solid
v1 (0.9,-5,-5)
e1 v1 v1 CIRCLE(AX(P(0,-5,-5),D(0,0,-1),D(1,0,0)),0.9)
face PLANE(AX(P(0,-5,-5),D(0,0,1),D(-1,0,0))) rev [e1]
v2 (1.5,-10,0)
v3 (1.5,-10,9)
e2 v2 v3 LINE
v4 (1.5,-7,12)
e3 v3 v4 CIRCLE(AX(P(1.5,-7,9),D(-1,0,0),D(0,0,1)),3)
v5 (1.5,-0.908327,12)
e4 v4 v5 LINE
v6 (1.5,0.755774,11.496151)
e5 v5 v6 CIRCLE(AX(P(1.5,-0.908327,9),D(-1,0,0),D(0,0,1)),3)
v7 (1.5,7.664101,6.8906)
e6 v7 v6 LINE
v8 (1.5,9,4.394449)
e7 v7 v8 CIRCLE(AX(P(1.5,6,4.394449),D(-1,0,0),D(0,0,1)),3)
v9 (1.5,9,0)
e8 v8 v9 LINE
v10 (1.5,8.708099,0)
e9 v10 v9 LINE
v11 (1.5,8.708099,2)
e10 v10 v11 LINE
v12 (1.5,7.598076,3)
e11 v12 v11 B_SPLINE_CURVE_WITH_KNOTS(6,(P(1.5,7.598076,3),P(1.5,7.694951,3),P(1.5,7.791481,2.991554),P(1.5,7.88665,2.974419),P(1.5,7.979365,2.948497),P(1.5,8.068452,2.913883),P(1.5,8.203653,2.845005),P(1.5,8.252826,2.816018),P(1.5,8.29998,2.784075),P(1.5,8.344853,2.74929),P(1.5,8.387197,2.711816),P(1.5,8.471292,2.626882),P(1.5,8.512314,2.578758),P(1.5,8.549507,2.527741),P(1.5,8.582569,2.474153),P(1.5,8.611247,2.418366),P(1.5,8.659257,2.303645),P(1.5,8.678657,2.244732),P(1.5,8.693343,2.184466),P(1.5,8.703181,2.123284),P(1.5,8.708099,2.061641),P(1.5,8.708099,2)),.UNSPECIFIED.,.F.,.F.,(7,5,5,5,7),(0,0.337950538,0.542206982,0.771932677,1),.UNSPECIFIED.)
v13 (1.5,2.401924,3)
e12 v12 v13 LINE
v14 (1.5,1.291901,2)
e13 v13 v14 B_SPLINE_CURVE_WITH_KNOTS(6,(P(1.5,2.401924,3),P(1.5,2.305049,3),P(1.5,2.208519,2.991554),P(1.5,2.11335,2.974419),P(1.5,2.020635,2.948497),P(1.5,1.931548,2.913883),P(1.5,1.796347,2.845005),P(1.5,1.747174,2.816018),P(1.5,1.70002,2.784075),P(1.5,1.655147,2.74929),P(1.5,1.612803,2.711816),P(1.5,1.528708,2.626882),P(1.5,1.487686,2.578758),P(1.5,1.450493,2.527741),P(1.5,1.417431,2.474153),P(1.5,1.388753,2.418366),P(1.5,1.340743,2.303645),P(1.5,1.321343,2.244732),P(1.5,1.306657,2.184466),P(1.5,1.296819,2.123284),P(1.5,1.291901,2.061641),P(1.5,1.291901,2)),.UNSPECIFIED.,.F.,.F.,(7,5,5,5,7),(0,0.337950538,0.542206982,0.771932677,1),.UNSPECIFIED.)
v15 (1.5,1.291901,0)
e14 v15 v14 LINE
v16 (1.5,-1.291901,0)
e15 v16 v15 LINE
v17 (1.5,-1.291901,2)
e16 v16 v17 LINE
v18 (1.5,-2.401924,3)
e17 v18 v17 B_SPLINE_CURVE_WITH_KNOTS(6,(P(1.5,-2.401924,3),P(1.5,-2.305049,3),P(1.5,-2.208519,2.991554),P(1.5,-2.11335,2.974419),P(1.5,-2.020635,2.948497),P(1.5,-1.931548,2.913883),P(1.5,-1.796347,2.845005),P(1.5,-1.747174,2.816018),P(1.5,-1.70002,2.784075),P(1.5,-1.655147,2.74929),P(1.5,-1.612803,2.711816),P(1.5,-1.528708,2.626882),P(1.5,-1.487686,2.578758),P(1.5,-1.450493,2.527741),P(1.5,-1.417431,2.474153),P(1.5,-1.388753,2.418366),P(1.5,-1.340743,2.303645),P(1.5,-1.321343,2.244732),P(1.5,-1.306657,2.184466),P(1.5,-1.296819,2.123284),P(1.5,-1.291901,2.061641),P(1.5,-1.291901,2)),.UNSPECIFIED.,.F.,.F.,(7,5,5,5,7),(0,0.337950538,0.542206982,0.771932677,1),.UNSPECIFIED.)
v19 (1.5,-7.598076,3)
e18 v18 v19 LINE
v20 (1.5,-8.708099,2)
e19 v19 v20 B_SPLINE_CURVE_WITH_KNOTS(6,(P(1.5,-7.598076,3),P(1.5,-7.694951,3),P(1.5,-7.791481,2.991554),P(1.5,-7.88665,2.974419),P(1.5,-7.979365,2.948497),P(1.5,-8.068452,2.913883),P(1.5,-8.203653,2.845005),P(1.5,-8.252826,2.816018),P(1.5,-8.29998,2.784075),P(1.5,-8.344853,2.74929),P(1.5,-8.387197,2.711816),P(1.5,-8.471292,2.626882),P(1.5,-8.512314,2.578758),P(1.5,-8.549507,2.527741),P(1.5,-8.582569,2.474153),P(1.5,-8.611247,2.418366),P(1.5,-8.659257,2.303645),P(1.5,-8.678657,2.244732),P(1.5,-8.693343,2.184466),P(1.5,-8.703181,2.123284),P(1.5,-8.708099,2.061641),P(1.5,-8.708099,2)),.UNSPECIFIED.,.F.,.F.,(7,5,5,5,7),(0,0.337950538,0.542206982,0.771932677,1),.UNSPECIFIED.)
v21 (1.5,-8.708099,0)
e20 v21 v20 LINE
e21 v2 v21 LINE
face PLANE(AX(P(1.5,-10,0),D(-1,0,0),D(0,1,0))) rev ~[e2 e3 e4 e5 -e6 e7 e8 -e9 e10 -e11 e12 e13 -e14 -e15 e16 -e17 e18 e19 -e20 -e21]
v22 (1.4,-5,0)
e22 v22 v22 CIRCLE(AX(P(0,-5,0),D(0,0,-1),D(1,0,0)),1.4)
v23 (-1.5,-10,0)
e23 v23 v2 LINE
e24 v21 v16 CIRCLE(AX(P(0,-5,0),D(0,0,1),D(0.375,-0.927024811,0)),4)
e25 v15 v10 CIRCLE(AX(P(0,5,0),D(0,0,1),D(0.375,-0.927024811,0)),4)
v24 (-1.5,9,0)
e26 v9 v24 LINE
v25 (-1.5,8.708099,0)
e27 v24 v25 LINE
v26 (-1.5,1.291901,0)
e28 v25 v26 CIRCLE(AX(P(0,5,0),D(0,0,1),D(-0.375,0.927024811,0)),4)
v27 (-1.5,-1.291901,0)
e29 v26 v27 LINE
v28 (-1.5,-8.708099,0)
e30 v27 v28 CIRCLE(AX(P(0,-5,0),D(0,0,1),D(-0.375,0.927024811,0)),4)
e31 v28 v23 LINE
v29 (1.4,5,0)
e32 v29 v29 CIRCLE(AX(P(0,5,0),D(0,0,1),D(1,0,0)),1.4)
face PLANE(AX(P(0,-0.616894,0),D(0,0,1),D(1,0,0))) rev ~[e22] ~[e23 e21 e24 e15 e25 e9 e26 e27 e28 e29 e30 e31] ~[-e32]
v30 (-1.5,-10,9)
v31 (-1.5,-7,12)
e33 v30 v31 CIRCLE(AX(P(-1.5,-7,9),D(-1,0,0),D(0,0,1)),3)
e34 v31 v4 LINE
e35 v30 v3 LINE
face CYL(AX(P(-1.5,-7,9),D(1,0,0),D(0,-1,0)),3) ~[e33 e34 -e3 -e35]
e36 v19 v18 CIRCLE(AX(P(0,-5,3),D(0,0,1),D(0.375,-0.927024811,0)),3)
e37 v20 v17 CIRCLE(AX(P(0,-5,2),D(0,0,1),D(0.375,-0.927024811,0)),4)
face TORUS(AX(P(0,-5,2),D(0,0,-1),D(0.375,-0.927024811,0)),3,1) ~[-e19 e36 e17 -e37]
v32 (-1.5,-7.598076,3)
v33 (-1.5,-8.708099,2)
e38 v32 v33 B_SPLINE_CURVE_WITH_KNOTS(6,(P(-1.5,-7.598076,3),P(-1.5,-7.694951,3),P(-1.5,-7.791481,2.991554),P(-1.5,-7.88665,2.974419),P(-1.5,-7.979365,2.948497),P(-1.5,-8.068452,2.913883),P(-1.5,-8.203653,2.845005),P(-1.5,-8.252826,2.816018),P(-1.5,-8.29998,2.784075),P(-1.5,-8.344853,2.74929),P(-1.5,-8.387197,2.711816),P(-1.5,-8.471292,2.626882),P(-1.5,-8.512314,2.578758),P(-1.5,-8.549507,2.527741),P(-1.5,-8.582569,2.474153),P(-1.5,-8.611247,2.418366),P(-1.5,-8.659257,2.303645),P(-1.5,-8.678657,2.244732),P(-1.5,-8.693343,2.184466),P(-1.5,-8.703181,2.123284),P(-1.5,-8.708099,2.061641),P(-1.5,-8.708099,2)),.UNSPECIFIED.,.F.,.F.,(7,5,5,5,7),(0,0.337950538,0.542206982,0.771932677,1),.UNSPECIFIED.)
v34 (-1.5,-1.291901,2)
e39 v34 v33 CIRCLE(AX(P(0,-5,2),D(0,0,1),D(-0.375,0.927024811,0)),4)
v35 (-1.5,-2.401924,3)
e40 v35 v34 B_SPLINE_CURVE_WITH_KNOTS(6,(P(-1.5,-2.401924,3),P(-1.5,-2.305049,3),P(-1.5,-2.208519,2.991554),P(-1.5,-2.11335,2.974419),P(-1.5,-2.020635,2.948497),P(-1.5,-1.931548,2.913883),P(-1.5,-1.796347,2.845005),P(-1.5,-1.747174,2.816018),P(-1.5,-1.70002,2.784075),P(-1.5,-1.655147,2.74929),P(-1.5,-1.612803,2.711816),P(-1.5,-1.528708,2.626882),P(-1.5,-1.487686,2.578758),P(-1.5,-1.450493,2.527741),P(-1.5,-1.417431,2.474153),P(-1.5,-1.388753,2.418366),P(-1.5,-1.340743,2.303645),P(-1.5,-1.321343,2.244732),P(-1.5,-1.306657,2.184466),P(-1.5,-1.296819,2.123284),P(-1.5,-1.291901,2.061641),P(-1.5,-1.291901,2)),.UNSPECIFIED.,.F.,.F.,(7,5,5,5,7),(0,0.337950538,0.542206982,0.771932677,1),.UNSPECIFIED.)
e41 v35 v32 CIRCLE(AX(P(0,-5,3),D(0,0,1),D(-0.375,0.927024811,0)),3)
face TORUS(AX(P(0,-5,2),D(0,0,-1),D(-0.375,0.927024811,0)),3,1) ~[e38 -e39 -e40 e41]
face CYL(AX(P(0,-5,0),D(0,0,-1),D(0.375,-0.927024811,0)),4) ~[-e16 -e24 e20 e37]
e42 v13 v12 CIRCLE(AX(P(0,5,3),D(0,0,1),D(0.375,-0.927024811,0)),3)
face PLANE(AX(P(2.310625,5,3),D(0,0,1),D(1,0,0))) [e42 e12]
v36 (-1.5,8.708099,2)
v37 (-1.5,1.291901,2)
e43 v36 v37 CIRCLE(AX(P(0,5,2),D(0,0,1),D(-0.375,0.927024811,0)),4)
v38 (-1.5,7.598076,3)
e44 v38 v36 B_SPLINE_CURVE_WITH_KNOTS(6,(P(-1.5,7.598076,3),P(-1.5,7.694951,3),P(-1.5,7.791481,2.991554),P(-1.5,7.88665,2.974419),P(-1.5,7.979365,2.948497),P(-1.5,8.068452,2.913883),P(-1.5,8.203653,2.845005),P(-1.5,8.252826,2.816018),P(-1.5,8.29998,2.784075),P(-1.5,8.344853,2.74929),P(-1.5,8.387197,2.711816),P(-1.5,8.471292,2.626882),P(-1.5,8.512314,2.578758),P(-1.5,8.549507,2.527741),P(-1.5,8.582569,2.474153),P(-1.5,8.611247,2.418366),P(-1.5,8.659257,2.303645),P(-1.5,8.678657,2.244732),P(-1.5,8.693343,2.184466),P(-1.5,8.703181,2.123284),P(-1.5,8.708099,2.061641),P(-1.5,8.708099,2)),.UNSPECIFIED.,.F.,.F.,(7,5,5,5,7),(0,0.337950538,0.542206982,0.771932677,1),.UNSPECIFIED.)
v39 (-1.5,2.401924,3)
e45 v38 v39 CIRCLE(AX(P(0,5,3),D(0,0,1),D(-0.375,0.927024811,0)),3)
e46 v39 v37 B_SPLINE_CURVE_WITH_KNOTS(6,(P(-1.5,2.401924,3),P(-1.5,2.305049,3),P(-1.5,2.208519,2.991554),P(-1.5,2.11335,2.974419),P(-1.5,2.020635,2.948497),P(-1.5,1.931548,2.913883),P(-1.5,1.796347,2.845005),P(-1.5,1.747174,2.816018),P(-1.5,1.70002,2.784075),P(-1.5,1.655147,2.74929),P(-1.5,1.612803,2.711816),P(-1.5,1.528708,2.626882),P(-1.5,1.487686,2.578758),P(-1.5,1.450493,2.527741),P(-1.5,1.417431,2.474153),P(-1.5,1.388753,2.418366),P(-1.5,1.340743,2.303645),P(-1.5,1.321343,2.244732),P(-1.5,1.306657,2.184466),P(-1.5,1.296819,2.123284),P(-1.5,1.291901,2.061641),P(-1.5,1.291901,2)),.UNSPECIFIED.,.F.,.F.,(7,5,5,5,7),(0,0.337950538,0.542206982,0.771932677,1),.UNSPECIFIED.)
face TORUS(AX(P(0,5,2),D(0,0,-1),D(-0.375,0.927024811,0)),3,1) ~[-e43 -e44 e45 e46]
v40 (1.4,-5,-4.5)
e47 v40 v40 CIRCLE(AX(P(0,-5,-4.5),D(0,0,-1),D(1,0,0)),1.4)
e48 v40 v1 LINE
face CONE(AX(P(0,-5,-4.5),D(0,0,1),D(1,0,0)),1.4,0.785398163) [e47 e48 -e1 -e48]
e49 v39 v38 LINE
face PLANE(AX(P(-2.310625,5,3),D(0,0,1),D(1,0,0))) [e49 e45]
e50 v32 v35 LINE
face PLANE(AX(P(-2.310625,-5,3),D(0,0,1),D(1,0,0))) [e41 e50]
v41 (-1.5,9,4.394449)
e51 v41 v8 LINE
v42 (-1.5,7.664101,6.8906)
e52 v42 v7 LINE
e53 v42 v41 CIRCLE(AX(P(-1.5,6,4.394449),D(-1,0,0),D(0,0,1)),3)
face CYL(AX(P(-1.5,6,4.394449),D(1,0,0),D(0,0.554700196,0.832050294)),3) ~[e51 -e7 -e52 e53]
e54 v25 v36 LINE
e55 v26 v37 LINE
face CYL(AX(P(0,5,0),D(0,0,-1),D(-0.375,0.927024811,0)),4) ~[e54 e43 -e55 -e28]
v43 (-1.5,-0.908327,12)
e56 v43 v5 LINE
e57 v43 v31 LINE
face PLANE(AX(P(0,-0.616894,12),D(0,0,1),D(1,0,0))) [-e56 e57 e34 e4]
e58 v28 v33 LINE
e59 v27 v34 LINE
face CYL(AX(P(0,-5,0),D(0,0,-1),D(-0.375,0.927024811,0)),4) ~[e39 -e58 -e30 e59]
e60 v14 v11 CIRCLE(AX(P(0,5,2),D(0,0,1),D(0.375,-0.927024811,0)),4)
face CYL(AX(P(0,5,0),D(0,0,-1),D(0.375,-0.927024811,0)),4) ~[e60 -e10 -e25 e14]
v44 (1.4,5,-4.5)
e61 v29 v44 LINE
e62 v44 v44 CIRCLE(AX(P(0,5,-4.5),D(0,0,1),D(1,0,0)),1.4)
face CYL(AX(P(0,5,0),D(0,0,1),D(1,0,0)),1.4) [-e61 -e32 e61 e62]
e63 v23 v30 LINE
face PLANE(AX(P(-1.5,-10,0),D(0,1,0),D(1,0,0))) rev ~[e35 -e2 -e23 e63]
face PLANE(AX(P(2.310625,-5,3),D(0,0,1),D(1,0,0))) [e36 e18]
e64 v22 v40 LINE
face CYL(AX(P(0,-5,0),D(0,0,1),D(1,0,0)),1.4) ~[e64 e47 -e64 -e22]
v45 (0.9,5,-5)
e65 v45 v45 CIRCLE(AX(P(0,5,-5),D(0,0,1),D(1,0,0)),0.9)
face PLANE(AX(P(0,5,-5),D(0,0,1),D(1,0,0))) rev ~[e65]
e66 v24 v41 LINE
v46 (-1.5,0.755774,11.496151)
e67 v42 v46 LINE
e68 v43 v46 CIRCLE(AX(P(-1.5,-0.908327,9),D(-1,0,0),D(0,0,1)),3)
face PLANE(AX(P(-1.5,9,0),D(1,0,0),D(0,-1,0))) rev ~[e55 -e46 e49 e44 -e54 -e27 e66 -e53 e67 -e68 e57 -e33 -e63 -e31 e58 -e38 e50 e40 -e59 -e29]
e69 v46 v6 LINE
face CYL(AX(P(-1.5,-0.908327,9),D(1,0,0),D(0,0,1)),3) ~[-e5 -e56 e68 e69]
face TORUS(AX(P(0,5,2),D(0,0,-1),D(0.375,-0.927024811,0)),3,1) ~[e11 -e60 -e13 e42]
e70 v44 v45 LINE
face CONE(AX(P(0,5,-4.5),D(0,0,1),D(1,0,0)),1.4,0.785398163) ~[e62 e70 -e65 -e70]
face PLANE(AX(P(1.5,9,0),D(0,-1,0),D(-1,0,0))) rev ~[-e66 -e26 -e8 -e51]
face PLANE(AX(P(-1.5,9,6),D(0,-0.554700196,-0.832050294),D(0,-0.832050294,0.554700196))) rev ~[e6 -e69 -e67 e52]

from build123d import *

# Parameters (mm, degrees)
F0_R     = 1.4
F1_DEPTH = 12
F2_DEPTH = 5
F3_SIZE  = 0.5
F4_DEPTH = 3
F5_R     = 1
F7_DEPTH = 25
F8_R     = 3


# Not quite as in the source:
# - a pattern or mirror of a feature is missing from the dataset's text; its kind, count and spacing are read off the source's solid
# - a feature names something its author has since deleted; it is built from what else it names


with BuildPart() as f1:
    # F0 (on Top) → F1 (new body)
    with BuildSketch(Plane.XY):
        with BuildLine():
            ThreePointArc((1.5, 8.7080992435), (0.7640690498, 8.92634671), (0, 9))
            ThreePointArc((0, 9), (-0.7640690498, 8.92634671), (-1.5, 8.7080992435))
            Line((-1.5, 8.7080992435), (-1.5, 1.2919007565))
            Line((-1.5, 1.2919007565), (-1.5, -1.2919007565))
            Line((-1.5, -1.2919007565), (-1.5, -8.7080992435))
            Line((-1.5, -8.7080992435), (-1.5, -10))
            Line((-1.5, -10), (1.5, -10))
            Line((1.5, -10), (1.5, -8.7080992435))
            Line((1.5, -8.7080992435), (1.5, -1.2919007565))
            Line((1.5, -1.2919007565), (1.5, 1.2919007565))
            Line((1.5, 1.2919007565), (1.5, 8.7080992435))
        make_face()
        with Locations((0, -5)):
            Circle(F0_R, mode=Mode.SUBTRACT)
        with Locations((0, 5)):
            Circle(F0_R, mode=Mode.SUBTRACT)
        with Locations((0, 5)):
            Circle(F0_R)
        with Locations((0, -5)):
            Circle(F0_R)
        with BuildLine():
            Line((0, 9), (-1.5, 9))
            Line((-1.5, 9), (-1.5, 8.7080992435))
            ThreePointArc((-1.5, 8.7080992435), (-0.7640690498, 8.92634671), (0, 9))
        make_face()
        with BuildLine():
            Line((1.5, 9), (0, 9))
            ThreePointArc((0, 9), (0.7640690498, 8.92634671), (1.5, 8.7080992435))
            Line((1.5, 8.7080992435), (1.5, 9))
        make_face()
    extrude(amount=F1_DEPTH)

    # F0 (on Top) → F2 (join)
    with BuildSketch(Plane.XY):
        with Locations((0, 5)):
            Circle(F0_R)
    f2 = extrude(amount=-F2_DEPTH)

    # F2_copies: F2 across plane
    add(f2.mirror(Plane(origin=(0, 0, 0), x_dir=(0, 0, -1), z_dir=(0, -1, 0))))

    # F3
    f3_edges = [f1.edges().sort_by_distance(p)[0] for p in [
        (-1.4, -5, -5),
        (-1.4, 5, -5),
    ]]
    chamfer(f3_edges, length=F3_SIZE)

    # F0 (on Top) → F4 (join)
    with BuildSketch(Plane.XY):
        with Locations((0, 5)):
            Circle(F0_R)
        with Locations((0, -5)):
            Circle(F0_R)
        with BuildLine():
            Line((0, 9), (-1.5, 9))
            Line((-1.5, 9), (-1.5, 8.7080992435))
            ThreePointArc((-1.5, 8.7080992435), (-0.7640690498, 8.92634671), (0, 9))
        make_face()
        with BuildLine():
            Line((1.5, 9), (0, 9))
            ThreePointArc((0, 9), (0.7640690498, 8.92634671), (1.5, 8.7080992435))
            Line((1.5, 8.7080992435), (1.5, 9))
        make_face()
        with BuildLine():
            Line((-1.5, 1.2919007565), (-1.5, 8.7080992435))
            ThreePointArc((-1.5, 8.7080992435), (-4, 5), (-1.5, 1.2919007565))
        make_face()
        with BuildLine():
            ThreePointArc((1.5, 1.2919007565), (4, 5), (1.5, 8.7080992435))
            Line((1.5, 8.7080992435), (1.5, 1.2919007565))
        make_face()
        with BuildLine():
            Line((-1.5, -8.7080992435), (-1.5, -1.2919007565))
            ThreePointArc((-1.5, -1.2919007565), (-4, -5), (-1.5, -8.7080992435))
        make_face()
        with BuildLine():
            ThreePointArc((1.5, -8.7080992435), (4, -5), (1.5, -1.2919007565))
            Line((1.5, -1.2919007565), (1.5, -8.7080992435))
        make_face()
    extrude(amount=F4_DEPTH)

    # F5
    f5_edges = [f1.edges().sort_by_distance(p)[0] for p in [
        (-4, -5, 3),
        (4, -5, 3),
        (-4, 5, 3),
        (4, 5, 3),
    ]]
    fillet(f5_edges, radius=F5_R)

    # F6 (on face) → F7 (cut)
    with BuildSketch(Plane(origin=(-1.5, 0, 0), x_dir=(0, -1, 0), z_dir=(-1, 0, 0))):
        Polygon((0, 12), (-9, 12), (-9, 6), align=None)
    extrude(amount=-F7_DEPTH, mode=Mode.SUBTRACT)

    # F8
    f8_edges = [f1.edges().sort_by_distance(p)[0] for p in [
        (0, -10, 12),
        (0, 0, 12),
        (0, 9, 6),
    ]]
    fillet(f8_edges, radius=F8_R)


solid = f1.part
